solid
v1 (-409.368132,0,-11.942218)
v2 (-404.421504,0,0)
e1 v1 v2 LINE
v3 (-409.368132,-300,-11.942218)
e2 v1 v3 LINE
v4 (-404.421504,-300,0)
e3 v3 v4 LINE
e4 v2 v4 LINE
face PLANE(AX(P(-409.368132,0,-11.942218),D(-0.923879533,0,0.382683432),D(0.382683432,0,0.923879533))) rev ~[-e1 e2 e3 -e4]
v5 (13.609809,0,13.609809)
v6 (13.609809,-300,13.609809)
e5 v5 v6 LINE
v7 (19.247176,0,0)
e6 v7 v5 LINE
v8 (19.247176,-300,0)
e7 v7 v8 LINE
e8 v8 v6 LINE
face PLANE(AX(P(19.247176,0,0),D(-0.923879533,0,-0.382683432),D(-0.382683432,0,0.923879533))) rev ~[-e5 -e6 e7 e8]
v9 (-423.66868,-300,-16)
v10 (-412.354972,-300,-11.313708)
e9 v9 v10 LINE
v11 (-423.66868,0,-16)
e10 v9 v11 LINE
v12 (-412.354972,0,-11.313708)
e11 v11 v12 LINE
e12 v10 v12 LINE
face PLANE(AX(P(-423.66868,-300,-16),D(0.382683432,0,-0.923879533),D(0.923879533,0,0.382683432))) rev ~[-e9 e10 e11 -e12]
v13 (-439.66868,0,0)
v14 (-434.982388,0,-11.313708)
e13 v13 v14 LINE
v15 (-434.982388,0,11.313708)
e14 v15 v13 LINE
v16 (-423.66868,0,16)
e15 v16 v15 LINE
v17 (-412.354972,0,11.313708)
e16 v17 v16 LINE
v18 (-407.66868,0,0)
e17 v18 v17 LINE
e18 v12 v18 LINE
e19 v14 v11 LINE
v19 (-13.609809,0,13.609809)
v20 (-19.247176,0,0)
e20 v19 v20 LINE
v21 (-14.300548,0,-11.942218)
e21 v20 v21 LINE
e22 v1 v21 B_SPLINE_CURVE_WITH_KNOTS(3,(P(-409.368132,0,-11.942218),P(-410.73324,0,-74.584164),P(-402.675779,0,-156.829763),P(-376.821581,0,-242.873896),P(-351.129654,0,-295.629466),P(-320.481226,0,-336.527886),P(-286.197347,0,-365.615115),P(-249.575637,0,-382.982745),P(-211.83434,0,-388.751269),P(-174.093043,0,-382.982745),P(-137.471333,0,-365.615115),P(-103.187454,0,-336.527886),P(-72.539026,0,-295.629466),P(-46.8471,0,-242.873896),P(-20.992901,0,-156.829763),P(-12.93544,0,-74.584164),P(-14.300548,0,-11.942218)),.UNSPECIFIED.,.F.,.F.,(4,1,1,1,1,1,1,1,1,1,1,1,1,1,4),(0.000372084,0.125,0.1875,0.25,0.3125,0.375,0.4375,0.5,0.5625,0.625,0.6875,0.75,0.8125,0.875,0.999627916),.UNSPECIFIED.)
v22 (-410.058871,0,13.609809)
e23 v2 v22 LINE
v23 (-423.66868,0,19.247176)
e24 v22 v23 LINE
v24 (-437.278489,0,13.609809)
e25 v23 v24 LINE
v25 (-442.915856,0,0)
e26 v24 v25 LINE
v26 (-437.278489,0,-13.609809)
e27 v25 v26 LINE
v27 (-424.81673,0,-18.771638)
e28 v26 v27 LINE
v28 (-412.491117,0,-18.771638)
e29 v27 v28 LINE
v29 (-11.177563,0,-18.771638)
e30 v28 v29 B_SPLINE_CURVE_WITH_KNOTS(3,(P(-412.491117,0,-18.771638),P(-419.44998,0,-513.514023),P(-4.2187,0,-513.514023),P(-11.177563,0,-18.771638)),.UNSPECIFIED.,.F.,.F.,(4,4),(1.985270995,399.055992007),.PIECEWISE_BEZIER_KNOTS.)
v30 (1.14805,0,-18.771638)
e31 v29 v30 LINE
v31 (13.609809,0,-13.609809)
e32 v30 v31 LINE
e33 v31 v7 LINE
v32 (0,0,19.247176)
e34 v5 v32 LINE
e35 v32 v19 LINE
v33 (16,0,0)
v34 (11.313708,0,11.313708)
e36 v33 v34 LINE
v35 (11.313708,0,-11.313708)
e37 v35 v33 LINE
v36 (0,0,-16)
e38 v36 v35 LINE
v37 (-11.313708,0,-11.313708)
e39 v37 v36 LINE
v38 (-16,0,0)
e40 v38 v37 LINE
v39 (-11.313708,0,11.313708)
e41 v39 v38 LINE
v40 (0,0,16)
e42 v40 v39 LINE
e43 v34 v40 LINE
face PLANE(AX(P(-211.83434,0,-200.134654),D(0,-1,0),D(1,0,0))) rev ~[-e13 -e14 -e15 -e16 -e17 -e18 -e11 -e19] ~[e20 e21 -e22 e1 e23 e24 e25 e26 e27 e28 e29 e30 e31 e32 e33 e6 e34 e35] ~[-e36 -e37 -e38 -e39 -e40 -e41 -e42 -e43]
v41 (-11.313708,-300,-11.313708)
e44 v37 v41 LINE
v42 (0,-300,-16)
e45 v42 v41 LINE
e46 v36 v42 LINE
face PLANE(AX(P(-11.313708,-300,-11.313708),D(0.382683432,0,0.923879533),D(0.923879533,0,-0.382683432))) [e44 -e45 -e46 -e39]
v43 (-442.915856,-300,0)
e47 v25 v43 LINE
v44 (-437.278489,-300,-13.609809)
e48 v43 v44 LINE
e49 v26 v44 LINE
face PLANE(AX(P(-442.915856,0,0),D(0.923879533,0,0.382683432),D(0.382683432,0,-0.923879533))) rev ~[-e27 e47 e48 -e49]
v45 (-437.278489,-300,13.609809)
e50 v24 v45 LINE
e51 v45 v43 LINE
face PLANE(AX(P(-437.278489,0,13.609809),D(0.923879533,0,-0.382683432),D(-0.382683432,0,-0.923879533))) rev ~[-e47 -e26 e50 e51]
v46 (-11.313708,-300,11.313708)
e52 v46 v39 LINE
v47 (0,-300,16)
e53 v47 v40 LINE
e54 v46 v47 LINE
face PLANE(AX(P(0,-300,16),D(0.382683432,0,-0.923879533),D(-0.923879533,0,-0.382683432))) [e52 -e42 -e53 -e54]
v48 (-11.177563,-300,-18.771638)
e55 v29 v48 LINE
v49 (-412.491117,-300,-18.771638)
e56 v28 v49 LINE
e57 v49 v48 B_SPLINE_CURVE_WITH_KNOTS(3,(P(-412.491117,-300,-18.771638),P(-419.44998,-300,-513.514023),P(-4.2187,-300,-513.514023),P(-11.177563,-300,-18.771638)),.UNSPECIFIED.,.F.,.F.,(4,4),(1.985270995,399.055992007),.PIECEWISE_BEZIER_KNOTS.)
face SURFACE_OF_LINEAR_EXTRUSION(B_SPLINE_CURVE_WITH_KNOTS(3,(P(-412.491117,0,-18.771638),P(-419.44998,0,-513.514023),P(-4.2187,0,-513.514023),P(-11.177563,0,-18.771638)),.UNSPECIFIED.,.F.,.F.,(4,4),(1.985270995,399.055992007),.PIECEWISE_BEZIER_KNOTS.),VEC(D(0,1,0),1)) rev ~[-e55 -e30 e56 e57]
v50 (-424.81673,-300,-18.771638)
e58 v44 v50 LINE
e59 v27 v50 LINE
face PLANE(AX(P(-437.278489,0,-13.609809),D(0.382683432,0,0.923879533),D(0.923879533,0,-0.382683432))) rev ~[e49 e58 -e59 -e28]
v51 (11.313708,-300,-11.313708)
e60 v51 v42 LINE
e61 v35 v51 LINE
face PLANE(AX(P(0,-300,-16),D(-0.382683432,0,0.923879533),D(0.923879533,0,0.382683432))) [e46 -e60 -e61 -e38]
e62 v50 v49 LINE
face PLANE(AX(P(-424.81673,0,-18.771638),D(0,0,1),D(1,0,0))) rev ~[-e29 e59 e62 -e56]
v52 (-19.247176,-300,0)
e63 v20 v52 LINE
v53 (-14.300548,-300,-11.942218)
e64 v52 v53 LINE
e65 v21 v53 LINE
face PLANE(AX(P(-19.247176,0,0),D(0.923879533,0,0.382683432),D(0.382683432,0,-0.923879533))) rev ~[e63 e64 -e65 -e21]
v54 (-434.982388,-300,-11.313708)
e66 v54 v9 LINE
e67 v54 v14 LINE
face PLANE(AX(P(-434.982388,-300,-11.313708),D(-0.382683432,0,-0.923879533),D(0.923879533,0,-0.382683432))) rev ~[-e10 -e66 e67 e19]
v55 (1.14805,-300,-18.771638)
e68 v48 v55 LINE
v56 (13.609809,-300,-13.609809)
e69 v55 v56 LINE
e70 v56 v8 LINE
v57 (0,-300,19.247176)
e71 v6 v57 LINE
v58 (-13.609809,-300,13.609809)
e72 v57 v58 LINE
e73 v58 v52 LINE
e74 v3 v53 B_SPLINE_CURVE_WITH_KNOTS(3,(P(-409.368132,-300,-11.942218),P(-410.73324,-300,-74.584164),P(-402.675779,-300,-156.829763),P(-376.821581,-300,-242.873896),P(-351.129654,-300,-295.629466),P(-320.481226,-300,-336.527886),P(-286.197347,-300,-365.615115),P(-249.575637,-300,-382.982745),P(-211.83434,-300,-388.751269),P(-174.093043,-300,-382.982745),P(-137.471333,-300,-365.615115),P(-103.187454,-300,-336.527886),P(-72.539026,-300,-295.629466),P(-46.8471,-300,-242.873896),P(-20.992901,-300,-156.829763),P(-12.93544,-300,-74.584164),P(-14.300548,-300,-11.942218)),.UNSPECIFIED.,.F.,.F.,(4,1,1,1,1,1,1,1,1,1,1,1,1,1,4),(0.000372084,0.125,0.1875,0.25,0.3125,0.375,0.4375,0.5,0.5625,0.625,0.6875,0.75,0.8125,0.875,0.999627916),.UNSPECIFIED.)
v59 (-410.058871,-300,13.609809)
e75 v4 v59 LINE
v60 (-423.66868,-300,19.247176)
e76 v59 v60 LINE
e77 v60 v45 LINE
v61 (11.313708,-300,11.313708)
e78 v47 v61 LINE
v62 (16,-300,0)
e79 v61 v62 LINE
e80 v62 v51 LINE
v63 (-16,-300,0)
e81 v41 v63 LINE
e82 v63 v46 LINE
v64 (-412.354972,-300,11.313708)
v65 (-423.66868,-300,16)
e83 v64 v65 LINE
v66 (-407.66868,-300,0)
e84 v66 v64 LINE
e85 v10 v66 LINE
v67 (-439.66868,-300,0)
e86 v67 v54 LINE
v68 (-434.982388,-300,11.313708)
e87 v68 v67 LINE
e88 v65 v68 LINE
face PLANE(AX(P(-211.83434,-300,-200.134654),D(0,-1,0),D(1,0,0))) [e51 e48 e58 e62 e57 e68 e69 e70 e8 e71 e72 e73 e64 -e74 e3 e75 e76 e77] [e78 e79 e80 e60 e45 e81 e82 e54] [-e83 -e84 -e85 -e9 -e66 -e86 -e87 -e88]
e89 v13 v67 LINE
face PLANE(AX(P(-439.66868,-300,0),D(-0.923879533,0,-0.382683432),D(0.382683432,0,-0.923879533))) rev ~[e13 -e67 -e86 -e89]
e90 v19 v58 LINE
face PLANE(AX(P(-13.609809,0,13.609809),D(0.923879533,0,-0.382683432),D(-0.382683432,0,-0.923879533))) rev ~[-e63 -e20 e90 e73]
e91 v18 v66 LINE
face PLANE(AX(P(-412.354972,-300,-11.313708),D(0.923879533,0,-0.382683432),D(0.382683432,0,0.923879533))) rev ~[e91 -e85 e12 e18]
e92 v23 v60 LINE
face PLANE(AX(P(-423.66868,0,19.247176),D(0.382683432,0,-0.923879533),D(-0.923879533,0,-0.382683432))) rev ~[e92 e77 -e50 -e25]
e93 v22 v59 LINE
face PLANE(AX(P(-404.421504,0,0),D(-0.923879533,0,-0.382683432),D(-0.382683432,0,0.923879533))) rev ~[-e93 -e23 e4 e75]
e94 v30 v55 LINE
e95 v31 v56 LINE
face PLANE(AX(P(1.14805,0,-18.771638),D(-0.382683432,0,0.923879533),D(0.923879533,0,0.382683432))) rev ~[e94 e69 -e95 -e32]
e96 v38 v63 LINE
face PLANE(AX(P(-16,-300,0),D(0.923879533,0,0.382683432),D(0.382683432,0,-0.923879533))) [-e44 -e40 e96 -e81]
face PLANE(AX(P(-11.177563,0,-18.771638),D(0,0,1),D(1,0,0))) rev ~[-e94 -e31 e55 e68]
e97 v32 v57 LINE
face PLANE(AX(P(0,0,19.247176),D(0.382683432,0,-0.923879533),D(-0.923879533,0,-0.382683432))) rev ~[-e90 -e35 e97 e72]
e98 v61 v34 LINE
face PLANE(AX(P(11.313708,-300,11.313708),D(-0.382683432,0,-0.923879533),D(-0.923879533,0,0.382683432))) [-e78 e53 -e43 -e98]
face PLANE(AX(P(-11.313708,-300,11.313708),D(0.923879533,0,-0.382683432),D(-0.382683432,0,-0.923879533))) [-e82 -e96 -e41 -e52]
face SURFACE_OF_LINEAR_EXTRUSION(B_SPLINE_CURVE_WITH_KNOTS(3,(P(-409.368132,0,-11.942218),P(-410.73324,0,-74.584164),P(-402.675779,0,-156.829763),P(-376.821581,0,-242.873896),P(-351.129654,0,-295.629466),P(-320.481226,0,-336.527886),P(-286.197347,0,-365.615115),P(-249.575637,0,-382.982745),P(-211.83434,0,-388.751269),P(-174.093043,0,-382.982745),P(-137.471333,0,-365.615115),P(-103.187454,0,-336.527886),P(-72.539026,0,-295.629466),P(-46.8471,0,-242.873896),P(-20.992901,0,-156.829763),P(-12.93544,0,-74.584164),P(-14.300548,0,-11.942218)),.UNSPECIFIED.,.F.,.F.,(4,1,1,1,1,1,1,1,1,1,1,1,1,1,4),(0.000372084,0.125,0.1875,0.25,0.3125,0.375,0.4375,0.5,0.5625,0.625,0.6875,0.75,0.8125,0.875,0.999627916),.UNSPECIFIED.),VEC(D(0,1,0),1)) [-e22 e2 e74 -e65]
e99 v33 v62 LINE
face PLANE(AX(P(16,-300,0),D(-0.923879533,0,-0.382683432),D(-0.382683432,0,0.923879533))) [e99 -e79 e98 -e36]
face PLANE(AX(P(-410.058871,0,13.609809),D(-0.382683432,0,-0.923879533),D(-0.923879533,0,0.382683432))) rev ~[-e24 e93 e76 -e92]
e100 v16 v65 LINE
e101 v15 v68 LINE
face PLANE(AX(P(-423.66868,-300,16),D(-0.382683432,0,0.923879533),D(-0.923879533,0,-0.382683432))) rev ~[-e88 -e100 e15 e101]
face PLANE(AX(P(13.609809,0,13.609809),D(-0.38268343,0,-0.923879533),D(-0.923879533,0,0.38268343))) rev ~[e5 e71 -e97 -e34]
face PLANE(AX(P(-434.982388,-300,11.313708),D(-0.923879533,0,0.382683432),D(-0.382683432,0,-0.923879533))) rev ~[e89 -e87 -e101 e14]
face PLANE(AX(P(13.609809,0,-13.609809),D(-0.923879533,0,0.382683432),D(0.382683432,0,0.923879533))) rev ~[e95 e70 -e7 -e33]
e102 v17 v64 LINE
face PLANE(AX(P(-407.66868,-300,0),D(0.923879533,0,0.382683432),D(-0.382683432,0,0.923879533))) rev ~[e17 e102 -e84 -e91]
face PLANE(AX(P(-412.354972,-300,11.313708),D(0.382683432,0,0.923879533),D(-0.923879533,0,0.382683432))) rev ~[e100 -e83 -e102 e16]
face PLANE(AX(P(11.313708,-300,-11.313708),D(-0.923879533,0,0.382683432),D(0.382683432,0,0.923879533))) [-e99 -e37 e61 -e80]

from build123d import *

# Parameters (mm, degrees)
F1_DEPTH = 300
F3_DEPTH = 300


# Not quite as in the source:
# - the dataset's text gives a spline's control points without its knots; the knots are read off the source's solid


with BuildPart() as f1:
    # F0 (on Front) → F1 (new body)
    with BuildSketch(Plane.XZ):
        with BuildLine():
            Line((-424.8167300832, -18.771638081), (-412.4911172581, -18.771638081))
            add(Edge.make_bspline(
                [(-412.4911172581, -18.771638081), (-419.449979951, -513.5140234726), (-4.218700049, -513.5140234726), (-11.1775627419, -18.771638081)],
                knots=[1.9852709954, 1.9852709954, 1.9852709954, 1.9852709954, 399.0559920066, 399.0559920066, 399.0559920066, 399.0559920066], degree=3))
            Line((-11.1775627419, -18.771638081), (1.1480500832, -18.771638081))
            Line((1.1480500832, -18.771638081), (13.6098086653, -13.6098086653))
            Line((13.6098086653, -13.6098086653), (19.2471759958, 0))
            Line((19.2471759958, 0), (13.6098086653, 13.6098086653))
            Line((13.6098086653, 13.6098086653), (-8.39e-08, 19.2471759958))
            Line((-8.39e-08, 19.2471759958), (-13.6098087492, 13.6098086653))
            Line((-13.6098087492, 13.6098086653), (-19.2471760796, 0))
            Line((-19.2471760796, 0), (-14.3005475861, -11.942217597))
            add(Edge.make_bspline(
                [(-409.3681324977, -11.942217597), (-410.7332400225, -74.5841642283), (-402.6757788071, -156.8297634974), (-376.8215805516, -242.8738956774), (-351.1296540078, -295.6294659172), (-320.4812264626, -336.5278862641), (-286.1973466058, -365.615114777), (-249.5756371129, -382.9827448689), (-211.8343400419, -388.7512690899), (-174.093042971, -382.9827448689), (-137.4713334781, -365.615114777), (-103.1874536213, -336.5278862641), (-72.5390260761, -295.6294659172), (-46.8470995323, -242.8738956774), (-20.9929012768, -156.8297634974), (-12.9354400614, -74.5841642283), (-14.3005475861, -11.942217597)],
                knots=[0.000372084, 0.000372084, 0.000372084, 0.000372084, 0.125, 0.1875, 0.25, 0.3125, 0.375, 0.4375, 0.5, 0.5625, 0.625, 0.6875, 0.75, 0.8125, 0.875, 0.999627916, 0.999627916, 0.999627916, 0.999627916], degree=3))
            Line((-409.3681324977, -11.942217597), (-404.4215040042, 0))
            Line((-404.4215040042, 0), (-410.0588713347, 13.6098086653))
            Line((-410.0588713347, 13.6098086653), (-423.66868, 19.2471759958))
            Line((-423.66868, 19.2471759958), (-437.2784886653, 13.6098086653))
            Line((-437.2784886653, 13.6098086653), (-442.9158559958, 0))
            Line((-442.9158559958, 0), (-437.2784886653, -13.6098086653))
            Line((-437.2784886653, -13.6098086653), (-424.8167300832, -18.771638081))
        make_face()
    extrude(amount=F1_DEPTH)

    # F2 (on face) → F3 (cut, symmetric)
    with BuildSketch(Plane.XZ.offset(300)):
        Polygon((-11.313708499, 11.313708499), (-16, 0), (-11.313708499, -11.313708499), (0, -16), (11.313708499, -11.313708499), (16, 0), (11.313708499, 11.313708499), (0, 16), align=None)
        Polygon((-412.354971501, -11.313708499), (-407.66868, 0), (-412.354971501, 11.313708499), (-423.66868, 16), (-434.982388499, 11.313708499), (-439.66868, 0), (-434.982388499, -11.313708499), (-423.66868, -16), align=None)
    extrude(amount=F3_DEPTH, both=True, mode=Mode.SUBTRACT)


solid = f1.part
